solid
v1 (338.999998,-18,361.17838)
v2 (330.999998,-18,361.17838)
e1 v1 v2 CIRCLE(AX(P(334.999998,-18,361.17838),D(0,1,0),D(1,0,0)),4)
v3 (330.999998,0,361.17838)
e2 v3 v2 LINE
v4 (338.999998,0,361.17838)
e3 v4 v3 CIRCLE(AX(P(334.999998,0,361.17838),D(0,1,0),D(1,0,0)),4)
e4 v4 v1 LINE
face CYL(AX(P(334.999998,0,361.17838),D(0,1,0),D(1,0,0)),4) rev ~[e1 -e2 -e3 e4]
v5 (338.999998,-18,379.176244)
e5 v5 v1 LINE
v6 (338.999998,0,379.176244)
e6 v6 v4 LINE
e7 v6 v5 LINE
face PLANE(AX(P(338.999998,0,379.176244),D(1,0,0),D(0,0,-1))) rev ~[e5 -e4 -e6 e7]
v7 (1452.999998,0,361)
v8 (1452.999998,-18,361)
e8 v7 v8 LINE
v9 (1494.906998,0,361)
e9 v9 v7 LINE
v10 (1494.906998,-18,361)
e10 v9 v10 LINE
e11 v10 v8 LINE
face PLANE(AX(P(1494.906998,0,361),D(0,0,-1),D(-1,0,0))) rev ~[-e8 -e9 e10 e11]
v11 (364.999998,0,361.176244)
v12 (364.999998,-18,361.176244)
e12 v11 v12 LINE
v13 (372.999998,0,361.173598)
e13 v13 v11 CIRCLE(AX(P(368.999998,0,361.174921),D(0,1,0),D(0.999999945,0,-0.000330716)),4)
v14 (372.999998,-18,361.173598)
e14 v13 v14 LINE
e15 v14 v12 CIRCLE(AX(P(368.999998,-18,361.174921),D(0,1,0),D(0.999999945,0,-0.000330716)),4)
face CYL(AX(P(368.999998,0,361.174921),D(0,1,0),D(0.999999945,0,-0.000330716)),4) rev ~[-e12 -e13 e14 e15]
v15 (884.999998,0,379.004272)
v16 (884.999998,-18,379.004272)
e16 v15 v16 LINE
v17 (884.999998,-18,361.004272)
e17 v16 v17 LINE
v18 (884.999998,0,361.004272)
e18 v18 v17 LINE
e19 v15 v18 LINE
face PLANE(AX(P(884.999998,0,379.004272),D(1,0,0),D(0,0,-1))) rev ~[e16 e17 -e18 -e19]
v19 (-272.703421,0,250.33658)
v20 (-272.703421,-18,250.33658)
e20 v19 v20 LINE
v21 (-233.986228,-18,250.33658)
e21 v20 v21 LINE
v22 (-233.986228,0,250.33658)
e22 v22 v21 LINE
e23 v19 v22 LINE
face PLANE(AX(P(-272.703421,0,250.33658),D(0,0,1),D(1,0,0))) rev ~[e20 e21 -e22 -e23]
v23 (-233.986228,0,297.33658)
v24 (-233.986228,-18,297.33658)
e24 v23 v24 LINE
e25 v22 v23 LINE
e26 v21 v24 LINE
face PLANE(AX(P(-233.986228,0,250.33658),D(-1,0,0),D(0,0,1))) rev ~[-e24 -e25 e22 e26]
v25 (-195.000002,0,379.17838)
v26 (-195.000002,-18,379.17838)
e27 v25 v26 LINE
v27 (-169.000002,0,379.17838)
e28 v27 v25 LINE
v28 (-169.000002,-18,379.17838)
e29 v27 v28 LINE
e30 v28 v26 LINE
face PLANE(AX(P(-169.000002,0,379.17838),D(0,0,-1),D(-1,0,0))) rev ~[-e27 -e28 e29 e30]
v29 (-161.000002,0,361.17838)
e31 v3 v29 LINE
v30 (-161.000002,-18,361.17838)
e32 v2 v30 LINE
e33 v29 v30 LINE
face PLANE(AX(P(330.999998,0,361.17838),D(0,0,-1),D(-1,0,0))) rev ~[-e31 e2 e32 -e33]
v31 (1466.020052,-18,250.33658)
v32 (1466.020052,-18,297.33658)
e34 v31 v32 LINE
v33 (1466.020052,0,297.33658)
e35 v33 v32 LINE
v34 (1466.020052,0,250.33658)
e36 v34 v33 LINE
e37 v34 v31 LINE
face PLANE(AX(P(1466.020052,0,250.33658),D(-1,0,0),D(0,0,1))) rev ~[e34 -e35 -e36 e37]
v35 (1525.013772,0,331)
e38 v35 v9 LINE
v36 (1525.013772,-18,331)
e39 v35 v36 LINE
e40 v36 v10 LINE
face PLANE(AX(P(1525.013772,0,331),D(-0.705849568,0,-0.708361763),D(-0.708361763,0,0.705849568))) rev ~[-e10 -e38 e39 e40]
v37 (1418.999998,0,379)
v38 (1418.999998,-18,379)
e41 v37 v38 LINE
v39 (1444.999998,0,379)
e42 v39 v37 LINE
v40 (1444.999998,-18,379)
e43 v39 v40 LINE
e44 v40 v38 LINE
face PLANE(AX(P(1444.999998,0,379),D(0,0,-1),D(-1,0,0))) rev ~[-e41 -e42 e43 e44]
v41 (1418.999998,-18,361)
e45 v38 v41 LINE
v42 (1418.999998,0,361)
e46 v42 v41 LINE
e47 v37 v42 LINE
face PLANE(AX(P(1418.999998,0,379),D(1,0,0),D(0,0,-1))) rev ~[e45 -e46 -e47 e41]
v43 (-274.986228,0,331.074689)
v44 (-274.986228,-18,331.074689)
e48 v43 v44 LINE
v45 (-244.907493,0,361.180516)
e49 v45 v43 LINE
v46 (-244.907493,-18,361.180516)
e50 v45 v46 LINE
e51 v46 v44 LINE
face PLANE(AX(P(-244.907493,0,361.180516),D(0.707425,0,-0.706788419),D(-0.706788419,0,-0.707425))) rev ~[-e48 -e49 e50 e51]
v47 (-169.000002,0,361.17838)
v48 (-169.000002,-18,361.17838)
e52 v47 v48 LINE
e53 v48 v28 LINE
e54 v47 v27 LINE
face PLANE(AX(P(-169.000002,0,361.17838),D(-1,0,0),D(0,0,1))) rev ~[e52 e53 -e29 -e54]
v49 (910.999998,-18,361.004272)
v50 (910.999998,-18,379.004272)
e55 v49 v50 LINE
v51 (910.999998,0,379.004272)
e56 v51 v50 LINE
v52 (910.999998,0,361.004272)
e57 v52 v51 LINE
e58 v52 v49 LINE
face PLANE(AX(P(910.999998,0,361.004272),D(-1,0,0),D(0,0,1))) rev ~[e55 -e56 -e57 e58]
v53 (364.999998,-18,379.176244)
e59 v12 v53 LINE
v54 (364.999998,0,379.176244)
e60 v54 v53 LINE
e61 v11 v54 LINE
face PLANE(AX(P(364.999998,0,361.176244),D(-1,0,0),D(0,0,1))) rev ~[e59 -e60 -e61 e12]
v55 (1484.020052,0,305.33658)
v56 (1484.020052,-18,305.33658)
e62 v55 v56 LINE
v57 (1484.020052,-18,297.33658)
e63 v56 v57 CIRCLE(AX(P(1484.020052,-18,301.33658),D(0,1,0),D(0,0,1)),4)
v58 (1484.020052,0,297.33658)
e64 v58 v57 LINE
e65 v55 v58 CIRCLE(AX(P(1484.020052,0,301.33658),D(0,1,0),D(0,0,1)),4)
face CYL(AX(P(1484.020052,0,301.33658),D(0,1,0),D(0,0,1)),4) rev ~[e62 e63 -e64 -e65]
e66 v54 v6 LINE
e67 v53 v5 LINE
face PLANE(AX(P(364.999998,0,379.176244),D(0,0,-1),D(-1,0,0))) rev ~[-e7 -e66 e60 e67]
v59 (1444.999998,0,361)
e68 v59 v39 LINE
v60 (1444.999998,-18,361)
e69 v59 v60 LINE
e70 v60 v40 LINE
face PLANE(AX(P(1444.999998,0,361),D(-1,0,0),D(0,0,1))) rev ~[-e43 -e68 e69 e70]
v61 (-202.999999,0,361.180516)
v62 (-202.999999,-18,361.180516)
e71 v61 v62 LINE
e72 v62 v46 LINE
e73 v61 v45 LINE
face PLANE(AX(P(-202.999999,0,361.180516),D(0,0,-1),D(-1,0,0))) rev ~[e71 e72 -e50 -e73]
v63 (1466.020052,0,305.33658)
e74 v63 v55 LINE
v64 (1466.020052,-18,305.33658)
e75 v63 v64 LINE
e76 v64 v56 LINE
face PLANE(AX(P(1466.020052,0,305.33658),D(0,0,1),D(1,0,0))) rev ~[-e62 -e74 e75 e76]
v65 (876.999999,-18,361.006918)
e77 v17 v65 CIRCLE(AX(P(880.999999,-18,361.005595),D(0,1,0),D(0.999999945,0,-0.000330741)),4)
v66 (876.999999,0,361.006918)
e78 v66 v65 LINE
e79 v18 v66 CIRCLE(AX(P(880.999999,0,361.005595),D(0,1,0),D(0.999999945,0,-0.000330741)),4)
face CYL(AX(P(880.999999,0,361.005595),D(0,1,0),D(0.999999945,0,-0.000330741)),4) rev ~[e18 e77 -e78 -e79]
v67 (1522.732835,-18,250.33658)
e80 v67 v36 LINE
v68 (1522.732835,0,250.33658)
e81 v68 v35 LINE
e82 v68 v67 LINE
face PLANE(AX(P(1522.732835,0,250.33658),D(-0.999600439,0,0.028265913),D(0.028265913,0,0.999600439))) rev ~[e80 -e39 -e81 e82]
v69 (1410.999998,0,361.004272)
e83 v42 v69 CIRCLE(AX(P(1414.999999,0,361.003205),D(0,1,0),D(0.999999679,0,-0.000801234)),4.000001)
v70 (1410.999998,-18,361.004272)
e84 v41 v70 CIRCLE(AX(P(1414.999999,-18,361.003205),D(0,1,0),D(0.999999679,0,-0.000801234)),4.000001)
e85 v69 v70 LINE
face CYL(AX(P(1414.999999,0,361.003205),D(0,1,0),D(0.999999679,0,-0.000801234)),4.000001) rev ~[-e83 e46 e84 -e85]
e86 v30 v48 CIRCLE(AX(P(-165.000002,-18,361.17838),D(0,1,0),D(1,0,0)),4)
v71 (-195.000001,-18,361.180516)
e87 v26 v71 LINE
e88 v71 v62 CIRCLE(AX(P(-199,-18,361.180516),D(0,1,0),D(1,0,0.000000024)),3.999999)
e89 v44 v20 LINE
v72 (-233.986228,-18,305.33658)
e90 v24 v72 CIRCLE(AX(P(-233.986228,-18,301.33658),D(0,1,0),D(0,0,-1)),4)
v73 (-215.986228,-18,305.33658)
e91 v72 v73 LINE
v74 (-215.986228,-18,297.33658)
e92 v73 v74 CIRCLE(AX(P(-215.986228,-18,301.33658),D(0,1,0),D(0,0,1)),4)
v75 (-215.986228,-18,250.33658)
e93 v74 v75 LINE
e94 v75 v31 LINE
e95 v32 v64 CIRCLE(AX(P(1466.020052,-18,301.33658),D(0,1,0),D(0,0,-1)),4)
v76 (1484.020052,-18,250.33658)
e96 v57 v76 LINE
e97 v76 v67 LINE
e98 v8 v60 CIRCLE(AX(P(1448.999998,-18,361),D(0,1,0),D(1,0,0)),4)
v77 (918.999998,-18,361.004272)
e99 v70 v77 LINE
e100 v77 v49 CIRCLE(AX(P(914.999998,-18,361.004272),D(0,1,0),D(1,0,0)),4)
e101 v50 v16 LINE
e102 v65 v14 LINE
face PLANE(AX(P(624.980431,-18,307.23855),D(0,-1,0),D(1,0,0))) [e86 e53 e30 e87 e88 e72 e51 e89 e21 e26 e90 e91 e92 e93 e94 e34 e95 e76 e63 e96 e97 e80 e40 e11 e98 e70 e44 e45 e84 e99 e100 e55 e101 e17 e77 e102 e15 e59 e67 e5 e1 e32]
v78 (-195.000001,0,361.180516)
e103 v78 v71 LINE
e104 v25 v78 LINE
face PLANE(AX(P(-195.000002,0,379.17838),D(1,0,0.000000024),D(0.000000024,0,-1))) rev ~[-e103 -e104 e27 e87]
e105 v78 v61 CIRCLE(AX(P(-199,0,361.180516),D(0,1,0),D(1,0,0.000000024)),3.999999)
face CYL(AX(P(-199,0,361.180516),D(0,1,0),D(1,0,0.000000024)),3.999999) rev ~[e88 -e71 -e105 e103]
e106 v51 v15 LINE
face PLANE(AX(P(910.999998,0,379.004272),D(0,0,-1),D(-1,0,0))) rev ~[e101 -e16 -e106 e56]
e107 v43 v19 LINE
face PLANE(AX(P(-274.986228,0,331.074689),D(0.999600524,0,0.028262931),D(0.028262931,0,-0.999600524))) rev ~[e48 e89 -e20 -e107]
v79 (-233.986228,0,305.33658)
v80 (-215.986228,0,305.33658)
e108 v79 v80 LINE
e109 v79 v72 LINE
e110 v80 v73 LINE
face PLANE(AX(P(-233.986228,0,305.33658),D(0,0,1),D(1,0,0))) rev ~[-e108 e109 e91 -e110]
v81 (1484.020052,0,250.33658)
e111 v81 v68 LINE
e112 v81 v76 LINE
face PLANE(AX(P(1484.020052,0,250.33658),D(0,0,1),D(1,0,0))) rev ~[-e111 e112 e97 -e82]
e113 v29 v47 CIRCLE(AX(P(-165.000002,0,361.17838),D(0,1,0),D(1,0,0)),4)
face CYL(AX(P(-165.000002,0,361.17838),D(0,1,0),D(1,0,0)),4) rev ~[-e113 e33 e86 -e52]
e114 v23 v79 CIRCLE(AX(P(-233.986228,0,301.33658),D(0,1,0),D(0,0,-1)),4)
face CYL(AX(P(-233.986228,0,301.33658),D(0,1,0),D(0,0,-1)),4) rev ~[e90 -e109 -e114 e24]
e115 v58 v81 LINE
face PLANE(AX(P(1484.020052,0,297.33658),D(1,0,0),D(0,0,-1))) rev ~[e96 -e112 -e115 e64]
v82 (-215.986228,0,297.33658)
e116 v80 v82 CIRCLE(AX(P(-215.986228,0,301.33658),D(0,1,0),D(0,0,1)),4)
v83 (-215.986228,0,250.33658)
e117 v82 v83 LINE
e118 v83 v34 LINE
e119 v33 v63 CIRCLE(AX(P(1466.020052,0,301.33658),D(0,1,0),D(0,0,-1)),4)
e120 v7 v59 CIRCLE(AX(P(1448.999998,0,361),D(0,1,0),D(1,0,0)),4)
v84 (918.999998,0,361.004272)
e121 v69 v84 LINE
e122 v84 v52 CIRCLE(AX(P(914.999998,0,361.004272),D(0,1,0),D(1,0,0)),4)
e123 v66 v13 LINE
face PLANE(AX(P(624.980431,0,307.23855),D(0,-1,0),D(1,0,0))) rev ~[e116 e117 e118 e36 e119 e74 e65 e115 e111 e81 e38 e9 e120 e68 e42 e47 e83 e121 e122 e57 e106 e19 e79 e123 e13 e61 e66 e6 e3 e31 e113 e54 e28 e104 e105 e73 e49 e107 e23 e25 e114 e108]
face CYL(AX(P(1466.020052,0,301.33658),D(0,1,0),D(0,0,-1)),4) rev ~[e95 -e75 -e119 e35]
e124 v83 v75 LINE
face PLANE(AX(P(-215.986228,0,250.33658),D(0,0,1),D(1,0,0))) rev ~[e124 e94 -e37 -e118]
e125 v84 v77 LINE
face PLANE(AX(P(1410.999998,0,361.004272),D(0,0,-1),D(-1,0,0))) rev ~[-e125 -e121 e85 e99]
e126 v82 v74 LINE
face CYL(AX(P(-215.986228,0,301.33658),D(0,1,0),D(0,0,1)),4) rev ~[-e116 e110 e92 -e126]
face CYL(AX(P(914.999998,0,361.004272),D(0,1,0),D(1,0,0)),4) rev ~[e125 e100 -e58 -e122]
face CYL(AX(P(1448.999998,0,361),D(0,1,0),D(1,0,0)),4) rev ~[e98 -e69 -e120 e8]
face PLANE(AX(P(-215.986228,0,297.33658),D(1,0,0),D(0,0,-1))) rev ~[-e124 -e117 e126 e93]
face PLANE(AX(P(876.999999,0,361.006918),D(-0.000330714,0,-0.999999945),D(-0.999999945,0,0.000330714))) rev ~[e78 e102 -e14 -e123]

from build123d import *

# Parameters (mm, degrees)
F1_DEPTH = 18


# Not quite as in the source:
# - ends of sketch curves that miss each other by under 0.0002 mm in the source are joined


with BuildPart() as f1:
    # F0 (on Front) → F1 (new body)
    with BuildSketch(Plane.XZ):
        with BuildLine():
            Line((1444.9999982887, 361), (1444.9999982887, 379))
            Line((1444.9999982887, 379), (1418.9999982887, 379))
            Line((1418.9999982887, 379), (1418.9999982887, 361.0032042947))
            Line((1418.9999982887, 361.0032042947), (1418.9999982887, 361))
            ThreePointArc((1418.9999982887, 361), (1414.9978620926, 357.0032048651), (1410.9999984313, 361.0042723931))
            Line((1410.9999984313, 361.0042723931), (918.9999984313, 361.0042723931))
            ThreePointArc((918.9999984313, 361.0042723931), (914.9999984313, 357.0042723931), (910.9999984313, 361.0042723931))
            Line((910.9999984313, 361.0042723931), (910.9999984313, 379.0042723931))
            Line((910.9999984313, 379.0042723931), (884.9999984313, 379.0042723931))
            Line((884.9999984313, 379.0042723931), (884.9999984313, 361.0055952483))
            Line((884.9999984313, 361.0055952483), (884.9999984313, 361.0042723931))
            ThreePointArc((884.9999984313, 361.0042723931), (880.9986755762, 357.005595467), (876.9999986501, 361.0069181034))
            Line((876.9999986501, 361.0069181034), (372.9999978512, 361.1735978616))
            ThreePointArc((372.9999978512, 361.1735978616), (368.9986752099, 357.1749209454), (364.9999982887, 361.1762435819))
            Line((364.9999982887, 361.1762435819), (364.9999982887, 379.1762435819))
            Line((364.9999982887, 379.1762435819), (338.9999982887, 379.1762435819))
            Line((338.9999982887, 379.1762435819), (338.9999982887, 361.1783797782))
            ThreePointArc((338.9999982887, 361.1783797782), (334.9999982887, 357.1783797782), (330.9999982887, 361.1783797782))
            Line((330.9999982887, 361.1783797782), (-161.0000017113, 361.1783797782))
            ThreePointArc((-161.0000017113, 361.1783797782), (-165.0000017113, 357.1783797782), (-169.0000017113, 361.1783797782))
            Line((-169.0000017113, 361.1783797782), (-169.0000017113, 379.1783797782))
            Line((-169.0000017113, 379.1783797782), (-195.0000017113, 379.1783797782))
            Line((-195.0000017113, 379.1783797782), (-195.0000012844, 361.180516095))
            ThreePointArc((-195.0000012844, 361.180516095), (-198.9999999526, 357.1805172846), (-202.9999987156, 361.1805160001))
            Line((-202.9999987156, 361.1805160001), (-215.9862284595, 361.1805160001))
            Line((-215.9862284595, 361.1805160001), (-233.9862284595, 361.1805160001))
            Line((-233.9862284595, 361.1805160001), (-244.90749278, 361.1805160001))
            Line((-244.90749278, 361.1805160001), (-274.9862284595, 331.0746893941))
            Line((-274.9862284595, 331.0746893941), (-272.7034209311, 250.3365797868))
            Line((-272.7034209311, 250.3365797868), (-233.9862284595, 250.3365797868))
            Line((-233.9862284595, 250.3365797868), (-233.9862284595, 297.3365797868))
            ThreePointArc((-233.9862284595, 297.3365797868), (-237.9862284595, 301.3365797868), (-233.9862284595, 305.3365797868))
            Line((-233.9862284595, 305.3365797868), (-215.9862284595, 305.3365797868))
            ThreePointArc((-215.9862284595, 305.3365797868), (-211.9862284595, 301.3365797868), (-215.9862284595, 297.3365797868))
            Line((-215.9862284595, 297.3365797868), (-215.9862284595, 250.3365797868))
            Line((-215.9862284595, 250.3365797868), (-134.9862284595, 250.3365797868))
            Line((-134.9862284595, 250.3365797868), (1385.0137715405, 250.3365797868))
            Line((1385.0137715405, 250.3365797868), (1466.020051896, 250.3365797868))
            Line((1466.020051896, 250.3365797868), (1466.020051896, 297.3365797868))
            ThreePointArc((1466.020051896, 297.3365797868), (1462.020051896, 301.3365797868), (1466.020051896, 305.3365797868))
            Line((1466.020051896, 305.3365797868), (1484.020051896, 305.3365797868))
            ThreePointArc((1484.020051896, 305.3365797868), (1488.020051896, 301.3365797868), (1484.020051896, 297.3365797868))
            Line((1484.020051896, 297.3365797868), (1484.020051896, 250.3365797868))
            Line((1484.020051896, 250.3365797868), (1522.7328349544, 250.3365797868))
            Line((1522.7328349544, 250.3365797868), (1525.0137715405, 331))
            Line((1525.0137715405, 331), (1494.9069982887, 361))
            Line((1494.9069982887, 361), (1466.022162316, 361))
            Line((1466.022162316, 361), (1452.9999982887, 361))
            ThreePointArc((1452.9999982887, 361), (1448.9999982887, 357), (1444.9999982887, 361))
        make_face()
    extrude(amount=F1_DEPTH)


solid = f1.part
